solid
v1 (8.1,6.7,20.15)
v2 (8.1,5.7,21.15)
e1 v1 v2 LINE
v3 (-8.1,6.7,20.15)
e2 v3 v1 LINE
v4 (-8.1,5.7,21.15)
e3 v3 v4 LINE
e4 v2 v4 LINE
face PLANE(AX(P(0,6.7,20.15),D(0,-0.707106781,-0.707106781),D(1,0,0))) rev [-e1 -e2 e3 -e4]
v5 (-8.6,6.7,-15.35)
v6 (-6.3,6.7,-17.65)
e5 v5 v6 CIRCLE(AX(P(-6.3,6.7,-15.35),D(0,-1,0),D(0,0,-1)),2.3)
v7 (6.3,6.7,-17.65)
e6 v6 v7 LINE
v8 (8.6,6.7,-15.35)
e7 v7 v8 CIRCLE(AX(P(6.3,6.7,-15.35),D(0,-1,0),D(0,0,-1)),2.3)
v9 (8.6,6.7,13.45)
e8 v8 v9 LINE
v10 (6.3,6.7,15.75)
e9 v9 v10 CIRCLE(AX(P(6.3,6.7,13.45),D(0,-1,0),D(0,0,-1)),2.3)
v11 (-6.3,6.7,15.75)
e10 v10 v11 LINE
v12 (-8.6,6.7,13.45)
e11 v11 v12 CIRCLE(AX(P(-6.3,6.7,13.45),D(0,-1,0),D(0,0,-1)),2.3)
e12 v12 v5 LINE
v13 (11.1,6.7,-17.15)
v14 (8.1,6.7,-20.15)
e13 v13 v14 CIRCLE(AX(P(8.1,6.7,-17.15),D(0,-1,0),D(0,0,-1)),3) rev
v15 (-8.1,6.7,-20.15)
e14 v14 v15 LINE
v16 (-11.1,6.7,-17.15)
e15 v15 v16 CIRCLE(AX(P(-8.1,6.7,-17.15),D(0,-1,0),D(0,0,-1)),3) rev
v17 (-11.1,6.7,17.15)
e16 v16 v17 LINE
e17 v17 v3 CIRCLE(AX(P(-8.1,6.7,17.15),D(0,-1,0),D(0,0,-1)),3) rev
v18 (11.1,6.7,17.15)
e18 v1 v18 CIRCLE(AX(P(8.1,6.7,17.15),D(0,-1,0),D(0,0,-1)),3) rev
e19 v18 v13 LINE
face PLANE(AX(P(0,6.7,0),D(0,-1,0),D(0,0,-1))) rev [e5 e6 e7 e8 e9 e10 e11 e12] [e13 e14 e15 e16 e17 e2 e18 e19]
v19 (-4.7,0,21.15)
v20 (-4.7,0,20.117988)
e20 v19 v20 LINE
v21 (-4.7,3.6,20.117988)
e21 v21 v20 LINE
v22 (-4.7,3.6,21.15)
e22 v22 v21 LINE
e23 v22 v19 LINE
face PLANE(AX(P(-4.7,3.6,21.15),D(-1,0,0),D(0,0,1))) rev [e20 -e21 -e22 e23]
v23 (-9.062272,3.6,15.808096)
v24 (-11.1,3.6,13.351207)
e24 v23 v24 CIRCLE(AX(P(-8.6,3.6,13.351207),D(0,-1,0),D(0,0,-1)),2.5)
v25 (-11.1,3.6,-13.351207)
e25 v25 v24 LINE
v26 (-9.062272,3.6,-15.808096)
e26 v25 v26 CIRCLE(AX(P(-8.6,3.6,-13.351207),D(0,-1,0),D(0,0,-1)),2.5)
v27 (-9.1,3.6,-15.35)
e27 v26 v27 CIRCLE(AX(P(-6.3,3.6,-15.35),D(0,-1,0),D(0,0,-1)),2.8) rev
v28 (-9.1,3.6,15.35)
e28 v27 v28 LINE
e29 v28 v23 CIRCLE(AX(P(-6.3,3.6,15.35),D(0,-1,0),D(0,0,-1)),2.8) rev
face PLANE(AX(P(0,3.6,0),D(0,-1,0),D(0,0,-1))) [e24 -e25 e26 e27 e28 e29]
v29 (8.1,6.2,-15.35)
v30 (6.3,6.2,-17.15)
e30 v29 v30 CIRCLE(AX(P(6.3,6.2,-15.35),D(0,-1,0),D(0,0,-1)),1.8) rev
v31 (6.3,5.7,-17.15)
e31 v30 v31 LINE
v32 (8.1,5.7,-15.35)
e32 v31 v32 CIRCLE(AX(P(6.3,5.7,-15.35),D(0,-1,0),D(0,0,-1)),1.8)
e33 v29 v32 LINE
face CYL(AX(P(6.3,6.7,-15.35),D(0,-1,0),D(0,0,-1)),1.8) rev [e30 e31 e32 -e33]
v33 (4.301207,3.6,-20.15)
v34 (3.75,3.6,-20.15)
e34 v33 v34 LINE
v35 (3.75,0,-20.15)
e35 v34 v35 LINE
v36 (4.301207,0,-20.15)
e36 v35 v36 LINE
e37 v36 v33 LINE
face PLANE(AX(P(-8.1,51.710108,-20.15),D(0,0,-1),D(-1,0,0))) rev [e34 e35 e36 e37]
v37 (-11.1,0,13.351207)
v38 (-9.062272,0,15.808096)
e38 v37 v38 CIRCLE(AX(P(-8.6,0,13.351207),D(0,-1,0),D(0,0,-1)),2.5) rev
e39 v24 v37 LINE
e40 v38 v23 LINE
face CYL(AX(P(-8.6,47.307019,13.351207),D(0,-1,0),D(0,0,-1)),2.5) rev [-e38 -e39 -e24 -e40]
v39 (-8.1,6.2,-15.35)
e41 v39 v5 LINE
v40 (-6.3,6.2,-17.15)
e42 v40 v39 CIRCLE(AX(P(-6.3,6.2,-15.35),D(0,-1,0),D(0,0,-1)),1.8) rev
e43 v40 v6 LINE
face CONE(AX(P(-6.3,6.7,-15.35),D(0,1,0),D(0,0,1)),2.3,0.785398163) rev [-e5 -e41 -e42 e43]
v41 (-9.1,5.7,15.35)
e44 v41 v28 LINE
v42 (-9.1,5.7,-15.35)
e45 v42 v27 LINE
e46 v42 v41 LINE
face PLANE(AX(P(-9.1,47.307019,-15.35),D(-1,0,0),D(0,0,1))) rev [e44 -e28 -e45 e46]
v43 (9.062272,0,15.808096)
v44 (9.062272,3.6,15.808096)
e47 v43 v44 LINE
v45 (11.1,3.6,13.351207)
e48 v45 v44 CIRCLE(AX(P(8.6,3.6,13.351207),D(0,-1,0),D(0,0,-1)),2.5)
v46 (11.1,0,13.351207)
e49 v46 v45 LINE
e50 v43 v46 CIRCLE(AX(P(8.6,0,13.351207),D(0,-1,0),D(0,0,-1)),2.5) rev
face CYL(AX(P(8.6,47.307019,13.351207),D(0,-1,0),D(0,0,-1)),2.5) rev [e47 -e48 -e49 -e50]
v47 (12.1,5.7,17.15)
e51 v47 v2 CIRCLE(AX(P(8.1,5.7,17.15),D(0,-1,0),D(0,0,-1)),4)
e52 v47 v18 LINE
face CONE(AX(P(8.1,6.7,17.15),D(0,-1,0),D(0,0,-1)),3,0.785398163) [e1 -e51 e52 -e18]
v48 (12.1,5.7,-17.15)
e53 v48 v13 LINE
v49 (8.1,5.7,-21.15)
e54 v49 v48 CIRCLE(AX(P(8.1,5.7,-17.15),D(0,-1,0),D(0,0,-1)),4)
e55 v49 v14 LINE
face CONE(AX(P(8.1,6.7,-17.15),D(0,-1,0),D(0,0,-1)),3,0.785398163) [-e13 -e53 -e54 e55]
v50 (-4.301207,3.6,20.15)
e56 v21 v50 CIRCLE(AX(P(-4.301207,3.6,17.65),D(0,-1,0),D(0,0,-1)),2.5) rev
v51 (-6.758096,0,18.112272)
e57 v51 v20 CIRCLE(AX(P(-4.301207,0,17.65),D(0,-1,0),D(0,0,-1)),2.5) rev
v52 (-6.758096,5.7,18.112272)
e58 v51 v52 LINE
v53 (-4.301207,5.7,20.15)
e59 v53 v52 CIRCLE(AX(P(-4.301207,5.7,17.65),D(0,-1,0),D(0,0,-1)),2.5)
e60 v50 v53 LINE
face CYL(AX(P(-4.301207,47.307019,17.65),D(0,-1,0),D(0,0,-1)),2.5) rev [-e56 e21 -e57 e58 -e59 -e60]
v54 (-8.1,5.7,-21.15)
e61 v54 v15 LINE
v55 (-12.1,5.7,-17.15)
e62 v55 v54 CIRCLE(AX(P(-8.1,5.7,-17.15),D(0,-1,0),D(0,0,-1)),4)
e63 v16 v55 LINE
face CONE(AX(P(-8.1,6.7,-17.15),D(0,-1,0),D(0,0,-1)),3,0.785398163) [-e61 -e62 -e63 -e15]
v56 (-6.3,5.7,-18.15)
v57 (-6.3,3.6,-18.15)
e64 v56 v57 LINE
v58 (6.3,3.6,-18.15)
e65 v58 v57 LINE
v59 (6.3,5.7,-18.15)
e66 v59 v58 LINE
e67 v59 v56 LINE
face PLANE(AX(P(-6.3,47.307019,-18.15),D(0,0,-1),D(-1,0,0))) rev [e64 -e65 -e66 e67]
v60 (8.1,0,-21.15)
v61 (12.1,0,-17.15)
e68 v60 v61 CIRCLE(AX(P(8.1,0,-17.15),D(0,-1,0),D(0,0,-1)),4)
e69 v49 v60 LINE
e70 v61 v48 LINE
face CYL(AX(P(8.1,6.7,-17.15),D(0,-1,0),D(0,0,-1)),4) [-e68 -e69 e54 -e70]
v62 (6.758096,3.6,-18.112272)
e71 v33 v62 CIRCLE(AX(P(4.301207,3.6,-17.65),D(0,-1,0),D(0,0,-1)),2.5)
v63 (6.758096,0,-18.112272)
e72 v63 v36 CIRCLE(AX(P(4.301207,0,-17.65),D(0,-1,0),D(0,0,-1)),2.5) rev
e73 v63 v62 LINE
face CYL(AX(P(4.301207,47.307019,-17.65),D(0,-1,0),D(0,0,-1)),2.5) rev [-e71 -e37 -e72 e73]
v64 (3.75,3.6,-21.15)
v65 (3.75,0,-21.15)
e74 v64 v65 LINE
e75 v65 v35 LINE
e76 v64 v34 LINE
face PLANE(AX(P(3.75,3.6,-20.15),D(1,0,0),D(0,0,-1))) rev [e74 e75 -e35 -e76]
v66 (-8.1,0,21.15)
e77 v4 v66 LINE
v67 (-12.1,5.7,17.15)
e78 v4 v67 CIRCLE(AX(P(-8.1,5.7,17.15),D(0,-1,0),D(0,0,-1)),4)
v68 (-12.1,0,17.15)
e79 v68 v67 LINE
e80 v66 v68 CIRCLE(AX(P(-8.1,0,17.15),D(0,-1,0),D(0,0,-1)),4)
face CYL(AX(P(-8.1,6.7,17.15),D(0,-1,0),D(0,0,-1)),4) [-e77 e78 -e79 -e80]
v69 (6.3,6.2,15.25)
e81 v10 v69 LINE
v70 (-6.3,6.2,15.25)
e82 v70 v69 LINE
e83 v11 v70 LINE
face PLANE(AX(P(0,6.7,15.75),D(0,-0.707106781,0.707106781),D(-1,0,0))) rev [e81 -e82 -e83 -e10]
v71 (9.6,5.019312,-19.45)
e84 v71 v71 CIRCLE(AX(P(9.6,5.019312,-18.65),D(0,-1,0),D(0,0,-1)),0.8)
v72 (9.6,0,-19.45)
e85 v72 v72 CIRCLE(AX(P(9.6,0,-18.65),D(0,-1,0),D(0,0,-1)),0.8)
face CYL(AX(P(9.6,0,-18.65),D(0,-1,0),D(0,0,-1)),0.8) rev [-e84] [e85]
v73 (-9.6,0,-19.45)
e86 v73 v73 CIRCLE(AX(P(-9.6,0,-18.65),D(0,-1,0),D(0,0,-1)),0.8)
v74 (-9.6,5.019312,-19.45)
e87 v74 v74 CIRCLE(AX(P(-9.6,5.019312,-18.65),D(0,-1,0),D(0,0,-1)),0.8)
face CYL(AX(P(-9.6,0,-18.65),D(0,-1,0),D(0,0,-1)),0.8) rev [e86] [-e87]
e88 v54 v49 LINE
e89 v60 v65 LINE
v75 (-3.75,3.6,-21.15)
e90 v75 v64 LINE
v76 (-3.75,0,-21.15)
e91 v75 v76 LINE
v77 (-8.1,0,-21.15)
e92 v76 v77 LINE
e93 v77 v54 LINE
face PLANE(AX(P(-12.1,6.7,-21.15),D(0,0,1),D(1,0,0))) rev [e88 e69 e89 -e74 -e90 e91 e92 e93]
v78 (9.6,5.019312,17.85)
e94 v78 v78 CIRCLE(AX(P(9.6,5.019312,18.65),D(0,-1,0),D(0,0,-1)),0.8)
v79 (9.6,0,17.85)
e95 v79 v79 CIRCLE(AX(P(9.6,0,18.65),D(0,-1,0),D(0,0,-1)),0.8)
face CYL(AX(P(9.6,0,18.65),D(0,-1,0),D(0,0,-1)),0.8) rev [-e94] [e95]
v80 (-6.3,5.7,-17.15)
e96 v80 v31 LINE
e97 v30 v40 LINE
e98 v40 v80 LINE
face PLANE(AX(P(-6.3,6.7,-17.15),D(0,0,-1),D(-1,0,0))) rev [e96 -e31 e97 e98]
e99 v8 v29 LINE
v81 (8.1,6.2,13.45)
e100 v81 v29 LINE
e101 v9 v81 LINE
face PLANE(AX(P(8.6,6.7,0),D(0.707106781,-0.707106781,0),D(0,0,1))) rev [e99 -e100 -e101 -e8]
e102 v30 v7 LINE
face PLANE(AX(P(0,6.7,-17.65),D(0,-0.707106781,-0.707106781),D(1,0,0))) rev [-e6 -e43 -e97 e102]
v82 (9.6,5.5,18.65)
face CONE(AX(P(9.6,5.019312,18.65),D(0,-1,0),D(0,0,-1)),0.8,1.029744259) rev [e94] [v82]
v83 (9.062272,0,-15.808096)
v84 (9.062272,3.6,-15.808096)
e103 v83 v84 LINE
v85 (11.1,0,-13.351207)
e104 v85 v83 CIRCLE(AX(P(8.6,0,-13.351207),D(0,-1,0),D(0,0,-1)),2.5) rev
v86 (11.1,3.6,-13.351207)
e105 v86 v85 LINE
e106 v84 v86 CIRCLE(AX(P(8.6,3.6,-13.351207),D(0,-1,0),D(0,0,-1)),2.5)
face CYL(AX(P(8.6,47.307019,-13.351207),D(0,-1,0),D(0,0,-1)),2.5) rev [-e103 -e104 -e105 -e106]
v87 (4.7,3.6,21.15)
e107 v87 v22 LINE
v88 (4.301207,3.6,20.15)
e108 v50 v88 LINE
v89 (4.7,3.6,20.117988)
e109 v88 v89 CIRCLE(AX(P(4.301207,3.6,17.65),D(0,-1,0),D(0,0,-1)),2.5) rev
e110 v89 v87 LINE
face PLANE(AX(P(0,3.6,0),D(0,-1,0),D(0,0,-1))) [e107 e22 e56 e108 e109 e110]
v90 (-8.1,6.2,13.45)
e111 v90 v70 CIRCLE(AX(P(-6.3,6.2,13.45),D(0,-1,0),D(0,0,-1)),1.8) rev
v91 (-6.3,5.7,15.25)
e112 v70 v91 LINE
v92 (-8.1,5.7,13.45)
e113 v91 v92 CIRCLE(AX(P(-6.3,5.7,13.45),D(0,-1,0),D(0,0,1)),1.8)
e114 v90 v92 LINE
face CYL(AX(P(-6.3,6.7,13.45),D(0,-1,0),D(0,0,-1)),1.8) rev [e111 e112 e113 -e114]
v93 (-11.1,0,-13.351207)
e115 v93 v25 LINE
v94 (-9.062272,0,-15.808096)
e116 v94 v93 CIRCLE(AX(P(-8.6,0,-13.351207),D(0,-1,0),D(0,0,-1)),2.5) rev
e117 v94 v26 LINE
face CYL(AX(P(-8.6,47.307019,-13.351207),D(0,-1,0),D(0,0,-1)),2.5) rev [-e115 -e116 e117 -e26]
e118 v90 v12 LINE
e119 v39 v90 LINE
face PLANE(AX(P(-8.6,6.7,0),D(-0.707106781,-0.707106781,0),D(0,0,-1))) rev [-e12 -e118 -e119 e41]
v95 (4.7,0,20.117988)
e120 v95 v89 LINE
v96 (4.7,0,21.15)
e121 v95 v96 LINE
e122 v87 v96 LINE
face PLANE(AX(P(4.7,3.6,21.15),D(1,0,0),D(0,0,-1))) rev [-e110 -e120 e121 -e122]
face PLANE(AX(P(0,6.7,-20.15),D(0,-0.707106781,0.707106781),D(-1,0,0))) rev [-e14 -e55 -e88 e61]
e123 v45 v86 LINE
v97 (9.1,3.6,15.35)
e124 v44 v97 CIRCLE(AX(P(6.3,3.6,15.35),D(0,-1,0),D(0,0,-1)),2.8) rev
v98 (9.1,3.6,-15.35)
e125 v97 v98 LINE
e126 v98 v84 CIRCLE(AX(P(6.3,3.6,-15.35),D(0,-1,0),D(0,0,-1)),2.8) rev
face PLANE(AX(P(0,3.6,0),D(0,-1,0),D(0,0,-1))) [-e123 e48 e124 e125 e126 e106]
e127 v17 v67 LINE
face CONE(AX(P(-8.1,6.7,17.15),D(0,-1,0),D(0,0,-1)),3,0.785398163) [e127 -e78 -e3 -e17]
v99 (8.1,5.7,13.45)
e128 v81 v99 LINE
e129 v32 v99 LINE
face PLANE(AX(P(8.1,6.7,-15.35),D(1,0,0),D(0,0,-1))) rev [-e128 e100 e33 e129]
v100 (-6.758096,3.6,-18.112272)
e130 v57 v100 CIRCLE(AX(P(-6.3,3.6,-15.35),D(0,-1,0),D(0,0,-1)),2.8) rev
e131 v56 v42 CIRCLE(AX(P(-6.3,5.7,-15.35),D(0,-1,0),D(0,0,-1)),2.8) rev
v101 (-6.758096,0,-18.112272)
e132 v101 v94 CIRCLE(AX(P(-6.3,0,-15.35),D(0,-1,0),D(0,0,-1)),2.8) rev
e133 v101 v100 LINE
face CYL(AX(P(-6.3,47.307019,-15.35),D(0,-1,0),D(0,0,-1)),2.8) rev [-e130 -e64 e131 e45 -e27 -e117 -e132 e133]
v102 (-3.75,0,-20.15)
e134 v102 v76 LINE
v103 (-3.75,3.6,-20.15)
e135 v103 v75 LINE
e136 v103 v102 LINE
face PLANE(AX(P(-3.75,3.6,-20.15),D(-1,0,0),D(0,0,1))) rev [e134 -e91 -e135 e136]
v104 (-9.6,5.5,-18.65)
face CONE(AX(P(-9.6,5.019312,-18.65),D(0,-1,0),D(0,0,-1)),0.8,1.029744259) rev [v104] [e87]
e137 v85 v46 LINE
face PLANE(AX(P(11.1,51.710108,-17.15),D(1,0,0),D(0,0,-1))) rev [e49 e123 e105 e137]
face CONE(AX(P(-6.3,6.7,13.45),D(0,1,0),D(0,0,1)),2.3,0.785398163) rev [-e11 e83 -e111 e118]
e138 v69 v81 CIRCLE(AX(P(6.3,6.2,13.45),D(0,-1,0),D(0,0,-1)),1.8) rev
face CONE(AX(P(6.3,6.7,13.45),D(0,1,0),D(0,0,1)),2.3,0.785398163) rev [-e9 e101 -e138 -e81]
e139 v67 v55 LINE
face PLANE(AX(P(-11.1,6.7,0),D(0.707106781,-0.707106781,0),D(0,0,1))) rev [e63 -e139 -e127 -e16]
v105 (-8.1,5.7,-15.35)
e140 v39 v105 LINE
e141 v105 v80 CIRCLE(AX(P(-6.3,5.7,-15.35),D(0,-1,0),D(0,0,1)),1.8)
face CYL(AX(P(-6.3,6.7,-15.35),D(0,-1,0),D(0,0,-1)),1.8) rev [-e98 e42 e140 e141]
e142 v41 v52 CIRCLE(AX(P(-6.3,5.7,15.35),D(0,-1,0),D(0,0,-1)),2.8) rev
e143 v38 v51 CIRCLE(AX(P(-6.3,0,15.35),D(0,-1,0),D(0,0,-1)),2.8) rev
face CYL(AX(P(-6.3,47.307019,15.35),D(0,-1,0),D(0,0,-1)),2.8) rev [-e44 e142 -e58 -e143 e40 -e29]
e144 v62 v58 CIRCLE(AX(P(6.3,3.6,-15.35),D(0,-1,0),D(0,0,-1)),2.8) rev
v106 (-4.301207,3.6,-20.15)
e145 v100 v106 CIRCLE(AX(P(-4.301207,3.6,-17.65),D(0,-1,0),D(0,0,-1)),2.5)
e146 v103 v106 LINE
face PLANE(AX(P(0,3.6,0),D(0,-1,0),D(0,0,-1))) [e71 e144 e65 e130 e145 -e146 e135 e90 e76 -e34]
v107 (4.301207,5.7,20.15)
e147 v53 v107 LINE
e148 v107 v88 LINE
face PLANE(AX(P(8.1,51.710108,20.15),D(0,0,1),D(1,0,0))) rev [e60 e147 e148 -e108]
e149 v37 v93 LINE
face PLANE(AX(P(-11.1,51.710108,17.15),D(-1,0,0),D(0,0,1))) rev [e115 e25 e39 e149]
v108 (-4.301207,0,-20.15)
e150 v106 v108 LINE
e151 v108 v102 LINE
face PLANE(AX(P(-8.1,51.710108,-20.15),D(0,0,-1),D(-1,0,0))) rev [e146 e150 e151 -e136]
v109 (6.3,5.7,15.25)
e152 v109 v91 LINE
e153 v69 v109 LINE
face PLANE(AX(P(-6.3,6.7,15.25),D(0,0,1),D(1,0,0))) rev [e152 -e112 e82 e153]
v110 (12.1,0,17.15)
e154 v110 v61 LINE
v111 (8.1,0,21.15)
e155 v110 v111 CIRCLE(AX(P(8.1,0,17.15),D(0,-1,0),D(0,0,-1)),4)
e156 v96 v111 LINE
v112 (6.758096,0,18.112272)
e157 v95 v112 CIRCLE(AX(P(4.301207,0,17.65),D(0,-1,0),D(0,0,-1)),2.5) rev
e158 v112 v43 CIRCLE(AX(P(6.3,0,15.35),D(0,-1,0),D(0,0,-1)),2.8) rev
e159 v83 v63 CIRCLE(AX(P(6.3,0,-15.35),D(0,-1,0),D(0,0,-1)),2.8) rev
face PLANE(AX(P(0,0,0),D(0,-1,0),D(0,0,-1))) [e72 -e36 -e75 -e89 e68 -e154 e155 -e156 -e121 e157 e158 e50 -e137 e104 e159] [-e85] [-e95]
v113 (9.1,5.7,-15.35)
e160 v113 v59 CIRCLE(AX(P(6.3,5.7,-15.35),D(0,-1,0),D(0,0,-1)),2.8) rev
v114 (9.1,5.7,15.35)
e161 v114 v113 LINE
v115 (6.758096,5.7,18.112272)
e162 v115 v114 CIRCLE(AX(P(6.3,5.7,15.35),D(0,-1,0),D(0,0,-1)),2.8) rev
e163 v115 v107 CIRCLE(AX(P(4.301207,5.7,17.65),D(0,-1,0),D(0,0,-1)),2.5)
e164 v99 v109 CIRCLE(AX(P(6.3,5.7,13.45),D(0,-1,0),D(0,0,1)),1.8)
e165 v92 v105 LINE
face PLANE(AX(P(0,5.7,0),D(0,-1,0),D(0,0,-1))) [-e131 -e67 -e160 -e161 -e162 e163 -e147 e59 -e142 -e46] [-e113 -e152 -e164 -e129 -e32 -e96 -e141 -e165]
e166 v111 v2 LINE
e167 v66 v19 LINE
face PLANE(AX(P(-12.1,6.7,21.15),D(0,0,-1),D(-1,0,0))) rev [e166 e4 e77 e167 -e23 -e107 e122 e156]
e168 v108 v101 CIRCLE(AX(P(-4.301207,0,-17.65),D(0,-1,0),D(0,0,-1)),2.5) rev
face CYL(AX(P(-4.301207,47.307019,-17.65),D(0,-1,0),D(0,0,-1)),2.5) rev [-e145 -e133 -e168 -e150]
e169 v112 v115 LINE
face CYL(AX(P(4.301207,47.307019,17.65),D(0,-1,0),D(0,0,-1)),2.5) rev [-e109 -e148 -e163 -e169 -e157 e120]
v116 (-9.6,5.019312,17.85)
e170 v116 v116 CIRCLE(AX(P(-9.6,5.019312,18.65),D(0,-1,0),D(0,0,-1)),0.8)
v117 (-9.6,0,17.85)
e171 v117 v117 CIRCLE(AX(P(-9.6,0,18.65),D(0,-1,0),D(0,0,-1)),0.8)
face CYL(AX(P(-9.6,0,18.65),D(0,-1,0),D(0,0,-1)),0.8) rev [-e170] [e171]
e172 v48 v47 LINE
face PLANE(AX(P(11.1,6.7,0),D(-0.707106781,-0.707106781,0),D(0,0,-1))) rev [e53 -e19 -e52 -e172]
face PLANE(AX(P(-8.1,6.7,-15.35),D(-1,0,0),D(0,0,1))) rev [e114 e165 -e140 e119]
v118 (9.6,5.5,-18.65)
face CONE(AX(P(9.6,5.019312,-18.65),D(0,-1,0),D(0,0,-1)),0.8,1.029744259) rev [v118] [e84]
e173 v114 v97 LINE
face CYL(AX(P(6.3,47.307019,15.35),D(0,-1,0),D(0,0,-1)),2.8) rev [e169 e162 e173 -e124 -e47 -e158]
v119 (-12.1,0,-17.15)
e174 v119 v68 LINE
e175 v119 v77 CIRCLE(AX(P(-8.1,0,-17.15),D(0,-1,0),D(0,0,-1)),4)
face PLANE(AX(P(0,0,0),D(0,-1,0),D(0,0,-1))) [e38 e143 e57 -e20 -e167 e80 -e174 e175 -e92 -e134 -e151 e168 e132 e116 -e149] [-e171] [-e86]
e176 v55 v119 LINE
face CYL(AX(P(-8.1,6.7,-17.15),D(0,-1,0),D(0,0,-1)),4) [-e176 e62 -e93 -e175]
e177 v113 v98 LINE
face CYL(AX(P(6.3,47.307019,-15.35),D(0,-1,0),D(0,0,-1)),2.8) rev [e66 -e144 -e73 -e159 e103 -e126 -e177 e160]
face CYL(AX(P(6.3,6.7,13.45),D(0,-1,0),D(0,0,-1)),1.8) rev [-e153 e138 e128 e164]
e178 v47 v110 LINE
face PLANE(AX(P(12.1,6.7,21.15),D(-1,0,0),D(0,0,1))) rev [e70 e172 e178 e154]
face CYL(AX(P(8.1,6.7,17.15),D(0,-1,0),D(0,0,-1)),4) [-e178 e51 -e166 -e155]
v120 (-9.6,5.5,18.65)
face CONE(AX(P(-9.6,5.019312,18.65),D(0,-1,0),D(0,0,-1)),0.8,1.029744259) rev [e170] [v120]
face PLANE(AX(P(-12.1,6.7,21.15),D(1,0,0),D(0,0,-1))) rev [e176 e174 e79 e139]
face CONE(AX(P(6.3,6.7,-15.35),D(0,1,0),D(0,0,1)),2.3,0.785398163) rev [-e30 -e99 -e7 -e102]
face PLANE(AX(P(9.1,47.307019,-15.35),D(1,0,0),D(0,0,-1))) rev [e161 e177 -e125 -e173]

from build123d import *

# Parameters (mm, degrees)
SKETCH_1_W          = 24.2
SKETCH_1_H          = 42.3
EXTRUDE_1_DEPTH     = 6.7
FILLET_1_R          = 4
CUT_EXTRUDE_1_DEPTH = 5.7
CUT_EXTRUDE_2_DEPTH = 26.024438056
CHAMFER_1_SIZE      = 0.5
CHAMFER_2_SIZE      = 1
CUT_EXTRUDE_3_DEPTH = 3.6
EXTRUDE_START       = 3.6
EXTRUDE_2_DEPTH     = 3.6
CUT_EXTRUDE_5_DEPTH = 2.1
FILLET_4_R          = 2.5
M2X0_4_3_D          = 1.6
M2X0_4_3_DEPTH      = 5.019311505
M2X0_4_3_TIP        = 0.480688495
SKETCH_14_W         = 7.5
SKETCH_14_H         = 1
CUT_EXTRUDE_6_DEPTH = 3.6
SKETCH_15_W         = 9.4
SKETCH_15_H         = 1.594635817
CUT_EXTRUDE_7_DEPTH = 3.6


with BuildPart() as part:
    # 草图1 → 凸台-拉伸1 (new body)
    with BuildSketch(Plane(origin=(0, 0, 0), x_dir=(1, 0, 0), z_dir=(0, 1, 0))):
        Rectangle(SKETCH_1_W, SKETCH_1_H)
    extrude(amount=EXTRUDE_1_DEPTH)

    # 圆角1
    fillet_1_edges = [part.edges().sort_by_distance(p)[0] for p in [
        (12.1, 3.35, 21.15),
        (-12.1, 3.35, 21.15),
        (-12.1, 3.35, -21.15),
        (12.1, 3.35, -21.15),
    ]]
    fillet(fillet_1_edges, radius=FILLET_1_R)

    # 草图2 → 切除-拉伸1 (cut)
    with BuildSketch(Plane.XZ):
        with BuildLine():
            Line((-6.3, -18.15), (6.3, -18.15))
            ThreePointArc((6.3, -18.15), (8.279898987, -17.329898987), (9.1, -15.35))
            Line((9.1, -15.35), (9.1, 15.35))
            ThreePointArc((9.1, 15.35), (8.279898987, 17.329898987), (6.3, 18.15))
            Line((6.3, 18.15), (-6.3, 18.15))
            ThreePointArc((-6.3, 18.15), (-8.279898987, 17.329898987), (-9.1, 15.35))
            Line((-9.1, 15.35), (-9.1, -15.35))
            ThreePointArc((-9.1, -15.35), (-8.279898987, -17.329898987), (-6.3, -18.15))
        make_face()
    extrude(amount=-CUT_EXTRUDE_1_DEPTH, mode=Mode.SUBTRACT)

    # 草图3 → 切除-拉伸2 (cut, through all)
    with BuildSketch(Plane.XZ.offset(-5.7)):
        with BuildLine():
            Line((-6.3, -17.15), (6.3, -17.15))
            ThreePointArc((6.3, -17.15), (7.572792206, -16.622792206), (8.1, -15.35))
            Line((8.1, -15.35), (8.1, 13.45))
            ThreePointArc((8.1, 13.45), (7.572792206, 14.722792206), (6.3, 15.25))
            Line((6.3, 15.25), (-6.3, 15.25))
            ThreePointArc((-6.3, 15.25), (-7.572792206, 14.722792206), (-8.1, 13.45))
            Line((-8.1, 13.45), (-8.1, -15.35))
            ThreePointArc((-8.1, -15.35), (-7.572792206, -16.622792206), (-6.3, -17.15))
        make_face()
    extrude(amount=-CUT_EXTRUDE_2_DEPTH, mode=Mode.SUBTRACT)

    # 倒角1
    chamfer_1_edges = [part.edges().sort_by_distance(p)[0] for p in [
        (-7.572792206, 6.7, 14.722792206),
        (0, 6.7, 15.25),
        (7.572792206, 6.7, 14.722792206),
        (8.1, 6.7, -0.95),
        (7.572792206, 6.7, -16.622792206),
        (0, 6.7, -17.15),
        (-7.572792206, 6.7, -16.622792206),
        (-8.1, 6.7, -0.95),
    ]]
    chamfer(chamfer_1_edges, length=CHAMFER_1_SIZE)

    # 倒角2
    chamfer_2_edges = [part.edges().sort_by_distance(p)[0] for p in [
        (12.1, 6.7, 0),
        (0, 6.7, 21.15),
        (0, 6.7, -21.15),
        (-12.1, 6.7, 0),
        (-10.928427125, 6.7, 19.978427125),
        (10.928427125, 6.7, -19.978427125),
        (-10.928427125, 6.7, -19.978427125),
        (10.928427125, 6.7, 19.978427125),
    ]]
    chamfer(chamfer_2_edges, length=CHAMFER_2_SIZE)

    # 草图4 → 切除-拉伸3 (cut)
    with BuildSketch(Plane.XZ):
        with BuildLine():
            Line((11.1, -17.15), (11.1, 17.15))
            ThreePointArc((11.1, 17.15), (10.221320344, 19.271320344), (8.1, 20.15))
            Line((8.1, 20.15), (-8.1, 20.15))
            ThreePointArc((-8.1, 20.15), (-10.221320344, 19.271320344), (-11.1, 17.15))
            Line((-11.1, 17.15), (-11.1, -17.15))
            ThreePointArc((-11.1, -17.15), (-10.221320344, -19.271320344), (-8.1, -20.15))
            Line((-8.1, -20.15), (8.1, -20.15))
            ThreePointArc((8.1, -20.15), (10.221320344, -19.271320344), (11.1, -17.15))
        make_face()
    extrude(amount=-CUT_EXTRUDE_3_DEPTH, mode=Mode.SUBTRACT)

    # 草图7 → 凸台-拉伸2 (add)
    with BuildSketch(Plane.XZ.offset(-3.6).offset(EXTRUDE_START)):
        with BuildLine():
            Line((6.758096095, 20.15), (8.1, 20.15))
            ThreePointArc((8.1, 20.15), (10.221320344, 19.271320344), (11.1, 17.15))
            Line((11.1, 17.15), (11.1, 15.808096095))
            Line((11.1, 15.808096095), (9.062272247, 15.808096095))
            ThreePointArc((9.062272247, 15.808096095), (8.279898987, 17.329898987), (6.758096095, 18.112272247))
            Line((6.758096095, 18.112272247), (6.758096095, 20.15))
        make_face()
        with BuildLine():
            Line((-6.758096095, 20.15), (-8.1, 20.15))
            ThreePointArc((-8.1, 20.15), (-10.221320344, 19.271320344), (-11.1, 17.15))
            Line((-11.1, 17.15), (-11.1, 15.808096095))
            Line((-11.1, 15.808096095), (-9.062272247, 15.808096095))
            ThreePointArc((-9.062272247, 15.808096095), (-8.279898987, 17.329898987), (-6.758096095, 18.112272247))
            Line((-6.758096095, 18.112272247), (-6.758096095, 20.15))
        make_face()
        with BuildLine():
            Line((-8.1, -20.15), (-6.758096095, -20.15))
            Line((-6.758096095, -20.15), (-6.758096095, -18.112272247))
            ThreePointArc((-6.758096095, -18.112272247), (-8.279898987, -17.329898987), (-9.062272247, -15.808096095))
            Line((-9.062272247, -15.808096095), (-11.1, -15.808096095))
            Line((-11.1, -15.808096095), (-11.1, -17.15))
            ThreePointArc((-11.1, -17.15), (-10.221320344, -19.271320344), (-8.1, -20.15))
        make_face()
        with BuildLine():
            Line((11.1, -17.15), (11.1, -15.808096095))
            Line((11.1, -15.808096095), (9.062272247, -15.808096095))
            ThreePointArc((9.062272247, -15.808096095), (8.279898987, -17.329898987), (6.758096095, -18.112272247))
            Line((6.758096095, -18.112272247), (6.758096095, -20.15))
            Line((6.758096095, -20.15), (8.1, -20.15))
            ThreePointArc((8.1, -20.15), (10.221320344, -19.271320344), (11.1, -17.15))
        make_face()
    extrude(amount=-EXTRUDE_2_DEPTH)

    # 草图13 → 切除-拉伸5 (cut)
    with BuildSketch(Plane.XZ.offset(-3.6)):
        with BuildLine():
            Line((6.758096095, 18.112272247), (6.758096095, 20.15))
            Line((6.758096095, 20.15), (-6.758096095, 20.15))
            Line((-6.758096095, 20.15), (-6.758096095, 18.112272247))
            ThreePointArc((-6.758096095, 18.112272247), (-6.529823528, 18.140552122), (-6.3, 18.15))
            Line((-6.3, 18.15), (6.3, 18.15))
            ThreePointArc((6.3, 18.15), (6.529823528, 18.140552122), (6.758096095, 18.112272247))
        make_face()
    extrude(amount=-CUT_EXTRUDE_5_DEPTH, mode=Mode.SUBTRACT)

    # 圆角4
    # the kernel refuses this fillet: 2.5 mm, written as the material it adds along each edge
    with BuildSketch(Plane(origin=(-11.1, 0, 15.808096095), x_dir=(0, 0, -1), z_dir=(0, 1, 0)), Plane(origin=(11.1, 0, -15.808096095), x_dir=(0, 0, 1), z_dir=(0, 1, 0)), Plane(origin=(-6.758096095, 0, -20.15), x_dir=(1, 0, 0), z_dir=(0, 1, 0))) as fillet_4_piece_1:
        with BuildLine():
            CenterArc((2.456889165, -2.5), FILLET_4_R, 90, 79.34417895)
            Line((0, -2.037727753), (-0.049137783, -2.028482308))
            ThreePointArc((-0.049137783, -2.028482308), (-0.05, -1.018863876), (-0.05, 0))
            Line((-0.05, 0), (0, 0.05))
            Line((0, 0.05), (2.456889165, 0.05))
            Line((2.456889165, 0.05), (2.456889165, 0))
        make_face()
    extrude(amount=3.6)
    with BuildSketch(Plane(origin=(-6.758096095, 0, 20.15), x_dir=(0, 0, -1), z_dir=(0, 1, 0))) as fillet_4_piece_2:
        with BuildLine():
            CenterArc((2.5, -2.456889165), FILLET_4_R, 100.65582105, 79.34417895)
            Line((0, -2.456889165), (-0.05, -2.456889165))
            Line((-0.05, -2.456889165), (-0.05, 0))
            Line((-0.05, 0), (0, 0.05))
            ThreePointArc((0, 0.05), (1.018863876, 0.05), (2.028482308, 0.049137783))
            Line((2.028482308, 0.049137783), (2.037727753, 0))
        make_face()
    extrude(amount=5.7)
    with BuildSketch(Plane(origin=(6.758096095, 0, 20.15), x_dir=(-1, 0, 0), z_dir=(0, 1, 0))) as fillet_4_piece_3:
        with BuildLine():
            CenterArc((2.456889165, -2.5), FILLET_4_R, 90, 79.34417895)
            Line((0, -2.037727753), (-0.049137783, -2.028482308))
            ThreePointArc((-0.049137783, -2.028482308), (-0.05, -1.018863876), (-0.05, 0))
            Line((-0.05, 0), (0, 0.05))
            Line((0, 0.05), (2.456889165, 0.05))
            Line((2.456889165, 0.05), (2.456889165, 0))
        make_face()
    extrude(amount=5.7)
    with BuildSketch(Plane(origin=(11.1, 0, 15.808096095), x_dir=(-1, 0, 0), z_dir=(0, 1, 0)), Plane(origin=(-11.1, 0, -15.808096095), x_dir=(1, 0, 0), z_dir=(0, 1, 0)), Plane(origin=(6.758096095, 0, -20.15), x_dir=(0, 0, 1), z_dir=(0, 1, 0))) as fillet_4_piece_4:
        with BuildLine():
            CenterArc((2.5, -2.456889165), FILLET_4_R, 100.65582105, 79.34417895)
            Line((0, -2.456889165), (-0.05, -2.456889165))
            Line((-0.05, -2.456889165), (-0.05, 0))
            Line((-0.05, 0), (0, 0.05))
            ThreePointArc((0, 0.05), (1.018863876, 0.05), (2.028482308, 0.049137783))
            Line((2.028482308, 0.049137783), (2.037727753, 0))
        make_face()
    extrude(amount=3.6)

    # M2x0.4 螺纹孔3
    with Locations(Plane(origin=(0, 0, 0), x_dir=(-1, 0, 0), z_dir=(0, -1, 0))):
        with Locations((-9.6, 18.65), (9.6, 18.65), (9.6, -18.65), (-9.6, -18.65)):
            Hole(M2X0_4_3_D / 2, depth=M2X0_4_3_DEPTH)
            with Locations((0, 0, -(M2X0_4_3_DEPTH + M2X0_4_3_TIP / 2))):  # 118° drill point
                Cone(0, M2X0_4_3_D / 2, M2X0_4_3_TIP, mode=Mode.SUBTRACT)

    # 草图14 → 切除-拉伸6 (cut)
    with BuildSketch(Plane.XZ):
        with Locations((0, -20.65)):
            Rectangle(SKETCH_14_W, SKETCH_14_H)
    extrude(amount=-CUT_EXTRUDE_6_DEPTH, mode=Mode.SUBTRACT)

    # 草图15 → 切除-拉伸7 (cut)
    with BuildSketch(Plane.XZ):
        with Locations((0, 20.352682092)):
            Rectangle(SKETCH_15_W, SKETCH_15_H)
    extrude(amount=-CUT_EXTRUDE_7_DEPTH, mode=Mode.SUBTRACT)


solid = part.part
